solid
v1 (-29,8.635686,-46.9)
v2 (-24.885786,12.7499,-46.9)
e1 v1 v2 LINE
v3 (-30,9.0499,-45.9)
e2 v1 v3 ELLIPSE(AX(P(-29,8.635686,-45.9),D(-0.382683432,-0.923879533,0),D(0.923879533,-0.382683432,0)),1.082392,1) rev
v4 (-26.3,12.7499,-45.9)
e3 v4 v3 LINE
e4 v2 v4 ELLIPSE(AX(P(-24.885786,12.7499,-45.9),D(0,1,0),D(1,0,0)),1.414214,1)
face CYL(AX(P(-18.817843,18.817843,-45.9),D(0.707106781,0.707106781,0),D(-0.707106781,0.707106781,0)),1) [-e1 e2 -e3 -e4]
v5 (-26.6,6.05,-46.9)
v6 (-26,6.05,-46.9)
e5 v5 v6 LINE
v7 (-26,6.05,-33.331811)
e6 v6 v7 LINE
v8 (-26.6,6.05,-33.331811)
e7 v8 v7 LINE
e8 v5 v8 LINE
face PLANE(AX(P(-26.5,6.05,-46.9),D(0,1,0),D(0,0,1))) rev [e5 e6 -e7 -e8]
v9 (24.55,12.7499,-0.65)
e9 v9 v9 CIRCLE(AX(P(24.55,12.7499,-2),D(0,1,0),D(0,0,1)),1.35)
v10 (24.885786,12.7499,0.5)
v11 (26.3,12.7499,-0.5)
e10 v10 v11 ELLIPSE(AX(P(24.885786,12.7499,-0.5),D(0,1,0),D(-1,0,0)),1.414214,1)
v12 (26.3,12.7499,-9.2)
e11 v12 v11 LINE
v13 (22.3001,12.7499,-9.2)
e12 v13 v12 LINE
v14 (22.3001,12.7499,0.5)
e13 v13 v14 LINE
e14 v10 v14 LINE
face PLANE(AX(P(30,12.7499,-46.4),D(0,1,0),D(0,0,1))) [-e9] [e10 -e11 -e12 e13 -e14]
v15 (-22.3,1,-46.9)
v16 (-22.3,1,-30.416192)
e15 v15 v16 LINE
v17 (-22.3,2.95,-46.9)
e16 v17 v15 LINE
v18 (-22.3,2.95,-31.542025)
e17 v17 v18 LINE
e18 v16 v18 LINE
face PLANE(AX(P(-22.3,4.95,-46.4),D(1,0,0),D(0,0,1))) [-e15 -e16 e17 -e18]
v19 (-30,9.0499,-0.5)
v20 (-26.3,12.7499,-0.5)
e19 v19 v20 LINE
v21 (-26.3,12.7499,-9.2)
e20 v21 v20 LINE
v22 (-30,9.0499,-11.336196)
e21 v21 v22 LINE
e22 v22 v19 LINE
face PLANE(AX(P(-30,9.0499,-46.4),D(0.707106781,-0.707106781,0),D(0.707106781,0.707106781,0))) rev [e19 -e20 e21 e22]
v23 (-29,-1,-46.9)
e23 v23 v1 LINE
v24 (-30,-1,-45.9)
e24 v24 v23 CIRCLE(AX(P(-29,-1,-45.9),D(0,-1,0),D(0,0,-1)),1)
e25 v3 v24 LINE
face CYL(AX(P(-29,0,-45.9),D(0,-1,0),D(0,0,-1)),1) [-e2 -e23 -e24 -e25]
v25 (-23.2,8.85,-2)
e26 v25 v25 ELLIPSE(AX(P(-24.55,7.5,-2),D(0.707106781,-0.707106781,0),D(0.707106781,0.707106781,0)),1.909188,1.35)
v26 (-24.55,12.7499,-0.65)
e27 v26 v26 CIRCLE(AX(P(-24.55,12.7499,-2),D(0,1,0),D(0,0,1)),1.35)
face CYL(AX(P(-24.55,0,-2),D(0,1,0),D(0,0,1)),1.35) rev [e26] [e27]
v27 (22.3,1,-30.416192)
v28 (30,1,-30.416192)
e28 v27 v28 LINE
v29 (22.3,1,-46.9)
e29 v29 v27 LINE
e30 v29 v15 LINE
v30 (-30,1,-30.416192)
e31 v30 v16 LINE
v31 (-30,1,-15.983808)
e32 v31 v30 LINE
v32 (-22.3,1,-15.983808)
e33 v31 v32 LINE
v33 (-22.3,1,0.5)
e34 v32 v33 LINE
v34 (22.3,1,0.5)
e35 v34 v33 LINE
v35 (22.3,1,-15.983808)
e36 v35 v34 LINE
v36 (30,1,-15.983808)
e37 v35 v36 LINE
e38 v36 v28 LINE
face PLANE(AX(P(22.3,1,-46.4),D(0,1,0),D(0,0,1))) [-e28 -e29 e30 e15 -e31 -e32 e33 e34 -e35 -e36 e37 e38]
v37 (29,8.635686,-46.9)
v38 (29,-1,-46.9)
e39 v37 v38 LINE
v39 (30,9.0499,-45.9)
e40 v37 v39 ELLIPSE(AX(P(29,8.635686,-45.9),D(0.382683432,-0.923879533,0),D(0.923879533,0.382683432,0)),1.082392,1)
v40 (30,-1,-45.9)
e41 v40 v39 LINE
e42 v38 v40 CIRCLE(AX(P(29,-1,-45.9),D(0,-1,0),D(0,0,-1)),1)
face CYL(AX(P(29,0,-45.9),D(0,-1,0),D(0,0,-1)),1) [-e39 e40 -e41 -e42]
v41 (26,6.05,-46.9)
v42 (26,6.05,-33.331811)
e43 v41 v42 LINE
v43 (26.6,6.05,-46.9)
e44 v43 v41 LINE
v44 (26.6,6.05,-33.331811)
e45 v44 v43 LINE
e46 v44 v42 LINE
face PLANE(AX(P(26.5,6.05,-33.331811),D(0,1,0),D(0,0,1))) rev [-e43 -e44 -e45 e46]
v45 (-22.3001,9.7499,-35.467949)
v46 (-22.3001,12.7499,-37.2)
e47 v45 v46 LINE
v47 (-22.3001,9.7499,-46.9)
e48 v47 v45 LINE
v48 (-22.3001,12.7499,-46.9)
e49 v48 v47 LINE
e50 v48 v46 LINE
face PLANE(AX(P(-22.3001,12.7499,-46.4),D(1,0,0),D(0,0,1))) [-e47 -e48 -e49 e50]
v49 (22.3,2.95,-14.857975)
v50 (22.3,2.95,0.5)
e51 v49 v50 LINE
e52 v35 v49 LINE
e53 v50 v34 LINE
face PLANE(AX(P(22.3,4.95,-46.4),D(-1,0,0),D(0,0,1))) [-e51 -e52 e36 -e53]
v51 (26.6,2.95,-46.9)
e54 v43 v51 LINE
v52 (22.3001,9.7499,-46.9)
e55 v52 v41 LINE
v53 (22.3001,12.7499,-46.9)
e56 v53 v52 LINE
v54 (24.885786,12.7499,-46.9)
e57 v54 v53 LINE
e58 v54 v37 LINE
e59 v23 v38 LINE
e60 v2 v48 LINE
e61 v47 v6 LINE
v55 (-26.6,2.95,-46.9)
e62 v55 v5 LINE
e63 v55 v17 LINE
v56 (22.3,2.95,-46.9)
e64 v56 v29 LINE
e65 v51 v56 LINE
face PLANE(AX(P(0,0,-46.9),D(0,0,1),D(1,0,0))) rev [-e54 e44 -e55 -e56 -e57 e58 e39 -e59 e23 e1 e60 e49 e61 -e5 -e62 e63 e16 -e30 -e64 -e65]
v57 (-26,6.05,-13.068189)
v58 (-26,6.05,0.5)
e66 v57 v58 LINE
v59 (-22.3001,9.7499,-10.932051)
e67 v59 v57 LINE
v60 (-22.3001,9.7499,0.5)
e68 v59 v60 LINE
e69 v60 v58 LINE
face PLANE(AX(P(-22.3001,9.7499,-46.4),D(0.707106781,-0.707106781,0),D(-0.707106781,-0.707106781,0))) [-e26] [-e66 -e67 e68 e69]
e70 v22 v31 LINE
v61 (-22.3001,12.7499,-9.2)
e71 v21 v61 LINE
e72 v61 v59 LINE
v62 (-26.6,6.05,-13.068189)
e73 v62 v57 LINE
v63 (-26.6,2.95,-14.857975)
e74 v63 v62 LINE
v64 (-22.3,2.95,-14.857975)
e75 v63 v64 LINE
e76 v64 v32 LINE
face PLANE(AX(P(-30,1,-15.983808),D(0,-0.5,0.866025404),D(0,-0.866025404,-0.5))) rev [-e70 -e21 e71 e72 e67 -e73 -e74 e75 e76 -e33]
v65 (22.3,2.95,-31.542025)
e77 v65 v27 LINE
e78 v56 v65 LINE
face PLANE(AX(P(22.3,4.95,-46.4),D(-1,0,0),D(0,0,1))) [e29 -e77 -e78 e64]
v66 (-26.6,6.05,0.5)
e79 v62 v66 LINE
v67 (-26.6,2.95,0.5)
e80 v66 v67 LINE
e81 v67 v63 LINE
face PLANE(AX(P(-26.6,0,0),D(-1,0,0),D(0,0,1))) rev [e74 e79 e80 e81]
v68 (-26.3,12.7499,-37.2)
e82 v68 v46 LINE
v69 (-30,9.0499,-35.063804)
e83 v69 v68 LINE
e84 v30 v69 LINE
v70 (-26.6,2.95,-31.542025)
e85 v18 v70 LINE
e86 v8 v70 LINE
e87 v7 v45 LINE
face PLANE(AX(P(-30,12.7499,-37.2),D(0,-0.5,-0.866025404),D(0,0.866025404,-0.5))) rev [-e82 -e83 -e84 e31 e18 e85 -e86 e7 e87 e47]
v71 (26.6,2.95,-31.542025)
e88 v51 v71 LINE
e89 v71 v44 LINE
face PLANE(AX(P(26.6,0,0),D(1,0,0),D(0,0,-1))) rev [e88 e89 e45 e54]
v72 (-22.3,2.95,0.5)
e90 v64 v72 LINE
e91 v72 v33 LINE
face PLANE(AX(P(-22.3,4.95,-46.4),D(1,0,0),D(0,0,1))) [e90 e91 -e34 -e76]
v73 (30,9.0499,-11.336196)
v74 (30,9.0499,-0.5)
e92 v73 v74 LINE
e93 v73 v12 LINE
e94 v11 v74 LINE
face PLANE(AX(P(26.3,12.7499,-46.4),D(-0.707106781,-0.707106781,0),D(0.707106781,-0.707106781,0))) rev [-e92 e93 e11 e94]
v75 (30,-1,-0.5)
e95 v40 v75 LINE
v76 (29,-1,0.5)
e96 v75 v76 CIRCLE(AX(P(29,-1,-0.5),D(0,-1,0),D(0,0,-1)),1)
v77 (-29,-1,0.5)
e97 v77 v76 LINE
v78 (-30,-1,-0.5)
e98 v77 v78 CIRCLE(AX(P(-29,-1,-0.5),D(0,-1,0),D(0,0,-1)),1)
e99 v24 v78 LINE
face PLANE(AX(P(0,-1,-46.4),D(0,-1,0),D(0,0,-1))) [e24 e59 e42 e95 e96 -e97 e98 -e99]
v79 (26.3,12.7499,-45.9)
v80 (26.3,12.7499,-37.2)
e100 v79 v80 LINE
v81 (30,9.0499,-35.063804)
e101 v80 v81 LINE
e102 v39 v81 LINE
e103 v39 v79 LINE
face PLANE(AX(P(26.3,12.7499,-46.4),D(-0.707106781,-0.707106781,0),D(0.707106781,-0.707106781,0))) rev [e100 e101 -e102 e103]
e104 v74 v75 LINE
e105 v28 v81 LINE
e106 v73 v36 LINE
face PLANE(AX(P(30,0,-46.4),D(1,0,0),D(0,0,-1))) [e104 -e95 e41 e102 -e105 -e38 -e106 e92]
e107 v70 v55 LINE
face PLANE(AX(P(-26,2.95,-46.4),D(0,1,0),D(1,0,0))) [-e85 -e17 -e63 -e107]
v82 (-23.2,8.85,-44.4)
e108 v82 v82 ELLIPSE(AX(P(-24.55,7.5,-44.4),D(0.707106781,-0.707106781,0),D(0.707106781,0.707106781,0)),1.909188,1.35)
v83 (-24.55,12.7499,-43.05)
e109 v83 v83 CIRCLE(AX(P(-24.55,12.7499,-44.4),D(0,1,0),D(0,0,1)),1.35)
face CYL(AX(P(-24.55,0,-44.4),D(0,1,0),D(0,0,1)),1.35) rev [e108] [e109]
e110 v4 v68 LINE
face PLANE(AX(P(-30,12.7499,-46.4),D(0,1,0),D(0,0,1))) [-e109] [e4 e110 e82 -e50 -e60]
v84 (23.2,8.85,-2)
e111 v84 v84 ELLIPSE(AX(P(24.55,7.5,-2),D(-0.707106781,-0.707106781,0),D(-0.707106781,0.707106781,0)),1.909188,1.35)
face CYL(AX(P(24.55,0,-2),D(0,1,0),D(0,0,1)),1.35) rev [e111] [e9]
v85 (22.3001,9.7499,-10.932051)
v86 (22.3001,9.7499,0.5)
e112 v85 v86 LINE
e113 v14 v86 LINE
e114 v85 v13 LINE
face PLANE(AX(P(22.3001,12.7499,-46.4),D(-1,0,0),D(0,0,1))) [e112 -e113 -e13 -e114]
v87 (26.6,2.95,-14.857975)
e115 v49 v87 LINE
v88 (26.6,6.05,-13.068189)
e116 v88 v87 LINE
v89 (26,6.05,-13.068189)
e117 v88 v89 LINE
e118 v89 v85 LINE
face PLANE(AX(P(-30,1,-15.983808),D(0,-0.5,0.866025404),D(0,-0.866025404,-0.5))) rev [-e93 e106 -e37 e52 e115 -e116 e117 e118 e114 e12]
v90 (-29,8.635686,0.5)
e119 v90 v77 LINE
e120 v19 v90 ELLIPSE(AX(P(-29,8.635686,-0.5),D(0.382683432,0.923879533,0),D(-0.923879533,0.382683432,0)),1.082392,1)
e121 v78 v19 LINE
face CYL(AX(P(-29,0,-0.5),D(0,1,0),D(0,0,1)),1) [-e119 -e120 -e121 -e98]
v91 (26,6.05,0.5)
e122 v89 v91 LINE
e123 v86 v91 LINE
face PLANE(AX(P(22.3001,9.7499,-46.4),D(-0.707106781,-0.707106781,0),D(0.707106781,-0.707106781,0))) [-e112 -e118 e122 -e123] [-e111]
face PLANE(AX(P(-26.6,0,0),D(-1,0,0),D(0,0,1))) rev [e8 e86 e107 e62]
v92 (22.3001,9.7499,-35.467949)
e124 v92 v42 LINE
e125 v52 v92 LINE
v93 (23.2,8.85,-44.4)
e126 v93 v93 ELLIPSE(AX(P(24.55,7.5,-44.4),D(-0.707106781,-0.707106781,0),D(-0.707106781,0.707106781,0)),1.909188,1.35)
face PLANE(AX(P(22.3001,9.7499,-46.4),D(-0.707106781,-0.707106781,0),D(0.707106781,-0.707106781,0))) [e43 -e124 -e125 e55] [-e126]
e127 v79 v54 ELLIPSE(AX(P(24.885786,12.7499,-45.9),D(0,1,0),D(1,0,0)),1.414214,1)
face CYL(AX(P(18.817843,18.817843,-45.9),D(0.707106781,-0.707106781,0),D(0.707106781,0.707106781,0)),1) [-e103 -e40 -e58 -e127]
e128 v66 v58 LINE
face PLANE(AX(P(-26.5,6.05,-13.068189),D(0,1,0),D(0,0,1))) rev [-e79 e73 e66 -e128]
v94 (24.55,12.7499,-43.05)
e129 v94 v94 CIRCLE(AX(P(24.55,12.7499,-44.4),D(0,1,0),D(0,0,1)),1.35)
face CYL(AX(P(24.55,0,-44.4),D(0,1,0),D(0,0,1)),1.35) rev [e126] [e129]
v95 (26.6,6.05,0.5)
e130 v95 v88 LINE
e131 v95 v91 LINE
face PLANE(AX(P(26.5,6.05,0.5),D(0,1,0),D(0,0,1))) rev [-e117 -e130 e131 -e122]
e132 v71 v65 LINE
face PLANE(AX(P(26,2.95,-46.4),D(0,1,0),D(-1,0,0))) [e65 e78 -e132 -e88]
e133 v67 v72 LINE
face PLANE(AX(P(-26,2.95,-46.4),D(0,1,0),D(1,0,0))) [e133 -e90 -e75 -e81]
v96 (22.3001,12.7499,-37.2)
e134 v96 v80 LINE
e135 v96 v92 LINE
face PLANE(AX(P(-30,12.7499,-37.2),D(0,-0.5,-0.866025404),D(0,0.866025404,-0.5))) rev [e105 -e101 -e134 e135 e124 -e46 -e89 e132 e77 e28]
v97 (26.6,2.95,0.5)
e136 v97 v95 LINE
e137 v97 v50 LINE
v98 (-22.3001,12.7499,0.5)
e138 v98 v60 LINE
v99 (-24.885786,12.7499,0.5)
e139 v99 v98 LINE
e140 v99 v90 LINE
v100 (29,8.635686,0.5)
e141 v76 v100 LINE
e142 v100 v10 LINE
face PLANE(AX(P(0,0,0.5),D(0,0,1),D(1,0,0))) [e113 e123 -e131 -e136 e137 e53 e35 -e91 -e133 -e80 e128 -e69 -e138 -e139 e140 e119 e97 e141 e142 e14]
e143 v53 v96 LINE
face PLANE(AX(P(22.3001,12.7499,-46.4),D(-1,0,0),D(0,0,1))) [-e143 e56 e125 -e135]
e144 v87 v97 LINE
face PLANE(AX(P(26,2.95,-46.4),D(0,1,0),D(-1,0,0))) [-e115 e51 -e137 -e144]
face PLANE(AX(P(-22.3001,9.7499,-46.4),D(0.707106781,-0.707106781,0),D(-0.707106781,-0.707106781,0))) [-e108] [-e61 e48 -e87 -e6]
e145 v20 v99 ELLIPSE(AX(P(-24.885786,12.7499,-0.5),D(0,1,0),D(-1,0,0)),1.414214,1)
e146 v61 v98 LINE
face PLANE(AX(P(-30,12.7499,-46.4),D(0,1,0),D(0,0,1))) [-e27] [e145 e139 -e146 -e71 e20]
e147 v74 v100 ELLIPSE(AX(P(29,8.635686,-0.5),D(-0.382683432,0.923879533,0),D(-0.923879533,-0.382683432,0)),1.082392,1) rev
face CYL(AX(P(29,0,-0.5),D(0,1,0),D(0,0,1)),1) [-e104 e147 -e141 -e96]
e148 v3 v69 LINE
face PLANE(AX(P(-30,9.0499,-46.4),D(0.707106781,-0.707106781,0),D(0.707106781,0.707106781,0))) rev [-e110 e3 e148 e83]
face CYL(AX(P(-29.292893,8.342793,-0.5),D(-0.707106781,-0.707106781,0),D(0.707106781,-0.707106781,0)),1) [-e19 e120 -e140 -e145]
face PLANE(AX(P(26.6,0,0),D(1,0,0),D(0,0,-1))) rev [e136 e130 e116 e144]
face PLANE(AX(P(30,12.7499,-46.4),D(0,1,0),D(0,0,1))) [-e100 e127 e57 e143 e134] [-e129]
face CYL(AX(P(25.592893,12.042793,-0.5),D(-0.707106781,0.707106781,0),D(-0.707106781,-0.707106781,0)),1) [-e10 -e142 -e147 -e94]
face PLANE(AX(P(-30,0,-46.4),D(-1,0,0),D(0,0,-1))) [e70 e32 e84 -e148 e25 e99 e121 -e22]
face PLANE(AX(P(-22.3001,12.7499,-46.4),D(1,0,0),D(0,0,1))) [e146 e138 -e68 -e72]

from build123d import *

# Parameters (mm, degrees)
BOSS_EXTRUDE1_DEPTH   = 46.39999966
SKETCH2_R             = 1.35
CUT_EXTRUDE1_DEPTH    = 57.705554564
CUT_EXTRUDE2_DEPTH    = 57.705554564
CUT_EXTRUDE3_DEPTH    = 77.912417193
MOVE_FACE1_BY         = 0.5
MOVE_FACE1_2_BY       = 0.5
CUT_EXTRUDE5_DEPTH    = 0.5
CUT_EXTRUDE6_DEPTH    = 0.5
MOVE_START            = 2.95
MOVE_FACE2_OUTLINE_W  = 4.2
MOVE_FACE2_OUTLINE_H  = 47.39999966
MOVE_FACE2_OUTLINE_R  = 1.35
MOVE_FACE2_DEPTH      = 2
MOVE_FACE3_BY         = 2
MOVE_FACE4_BY         = 0.1
MOVE_FACE4_2_BY       = 0.1
MOVE_FACE4_3_BY       = 0.1
MOVE_FACE4_4_BY       = 0.1
SKETCH14_W            = 31.645569848
SKETCH14_H            = 25
BOSS_EXTRUDE4_DEPTH   = 4
SKETCH15_R            = 2.1
CUT_EXTRUDE9_DEPTH    = 59.746648569
SKETCH16_R            = 3.6
CUT_EXTRUDE10_DEPTH   = 4.2
MOVE_FACE5_BY         = 4
MOVE_FACE6_BY         = 1
FILLET1_R             = 1
DELETEFACE1_START     = -5
DELETEFACE1_OUTLINE_R = 3.6
DELETEFACE1_DEPTH     = 6
DELETEFACE2_START     = -5
DELETEFACE2_OUTLINE_R = 1.35
DELETEFACE2_DEPTH     = 7.95
MOVE_FACE7_BY         = 4


# Read off the part's stored shape, not the designer's step: Move Face2, DeleteFace1, DeleteFace2
with BuildPart() as part:
    # Sketch1 → Boss-Extrude1 (new body)
    with BuildSketch(Plane.XY):
        Polygon((0, 0), (30, 0), (30, 12.7499), (22.3001, 12.7499), (22.3001, 9.7499), (26, 6.05), (26, 4.95), (22.3, 4.95), (22.3, 1), (0, 1), align=None)
    extrude(amount=-BOSS_EXTRUDE1_DEPTH)

    # Mirror1: part across plane


with BuildPart() as part_1:
    add(part.part)
    add(part.part.mirror(Plane(origin=(0, 1, -46.39999966), x_dir=(0, 0, 1), z_dir=(-1, 0, 0))))

    # Sketch2 → Cut-Extrude1 (cut, through all)
    with BuildSketch(Plane(origin=(0, 12.7499, 0), x_dir=(1, 0, 0), z_dir=(0, 1, 0))):
        with Locations(Location((-24.549999831, 1.999999999, 0), (0, 0, 270))):
            Circle(SKETCH2_R)
        with Locations(Location((-24.549999831, 44.399999661, 0), (0, 0, 270))):
            Circle(SKETCH2_R)
        with Locations(Location((24.549999831, 1.999999999, 0), (0, 0, 270))):
            Circle(SKETCH2_R)
        with Locations(Location((24.549999831, 44.399999661, 0), (0, 0, 270))):
            Circle(SKETCH2_R)
    extrude(amount=-CUT_EXTRUDE1_DEPTH, mode=Mode.SUBTRACT)

    # Sketch3 → Cut-Extrude2 (cut, through all)
    with BuildSketch(Plane.XY):
        Polygon((26.3, 12.7499), (30, 9.0499), (30, 12.7499), align=None)
        Polygon((-30, 12.7499), (-30, 9.0499), (-26.3, 12.7499), align=None)
    extrude(amount=-CUT_EXTRUDE2_DEPTH, mode=Mode.SUBTRACT)

    # Sketch4 → Cut-Extrude3 (cut, through all)
    with BuildSketch(Plane(origin=(30, 0, 0), x_dir=(0, 0, -1), z_dir=(1, 0, 0))):
        Polygon((9.19999983, 12.7499), (37.19999983, 12.7499), (30.416191902, 1), (15.983807758, 1), align=None)
    extrude(amount=-CUT_EXTRUDE3_DEPTH, mode=Mode.SUBTRACT)

    # Move Face1: a face moved outward by 0.5
    extrude(part_1.faces().sort_by_distance((-24, 3.187475, -46.39999966))[0], amount=MOVE_FACE1_BY, dir=(0, 0, -1))

    # Move Face1 2: a face moved outward by 0.5
    extrude(part_1.faces().sort_by_distance((-24, 3.187475, 0))[0], amount=MOVE_FACE1_2_BY, dir=(0, 0, 1))

    # Sketch6 → Cut-Extrude5 (cut)
    with BuildSketch(Plane(origin=(-26, 0, 0), x_dir=(0, 0, -1), z_dir=(1, 0, 0))):
        Polygon((13.703274195, 4.95), (13.068188899, 6.05), (-0.5, 6.05), (-0.5, 4.95), align=None)
        Polygon((33.331810761, 6.05), (32.696725465, 4.95), (46.89999966, 4.95), (46.89999966, 6.05), align=None)
    extrude(amount=-CUT_EXTRUDE5_DEPTH, mode=Mode.SUBTRACT)

    # Sketch7 → Cut-Extrude6 (cut)
    with BuildSketch(Plane.ZY.offset(-26)):
        Polygon((-13.068188899, 6.05), (-13.703274195, 4.95), (0.5, 4.95), (0.5, 6.05), align=None)
        Polygon((-32.696725465, 4.95), (-33.331810761, 6.05), (-46.89999966, 6.05), (-46.89999966, 4.95), align=None)
    extrude(amount=-CUT_EXTRUDE6_DEPTH, mode=Mode.SUBTRACT)

    # Move Face2 outline → Move Face2 (cut)
    # profile 1 of 2: a face of its own
    with BuildSketch(Plane(origin=(0, 0, 0), x_dir=(1, 0, 0), z_dir=(0, 1, 0)).offset(MOVE_START)):
        with Locations((-24.4, 23.19999983)):
            Rectangle(MOVE_FACE2_OUTLINE_W, MOVE_FACE2_OUTLINE_H)
        with Locations((-24.549999831, 1.999999999)):
            Circle(MOVE_FACE2_OUTLINE_R, mode=Mode.SUBTRACT)
        with Locations((-24.549999831, 44.399999661)):
            Circle(MOVE_FACE2_OUTLINE_R, mode=Mode.SUBTRACT)
    # profile 2 of 2: a face of its own
    with BuildSketch(Plane(origin=(0, 0, 0), x_dir=(1, 0, 0), z_dir=(0, 1, 0)).offset(MOVE_START)):
        with Locations((24.4, 23.19999983)):
            Rectangle(MOVE_FACE2_OUTLINE_W, MOVE_FACE2_OUTLINE_H)
        with Locations((24.549999831, 1.999999999)):
            Circle(MOVE_FACE2_OUTLINE_R, mode=Mode.SUBTRACT)
        with Locations((24.549999831, 44.399999661)):
            Circle(MOVE_FACE2_OUTLINE_R, mode=Mode.SUBTRACT)
    extrude(amount=MOVE_FACE2_DEPTH, mode=Mode.SUBTRACT)

    # Move Face3: a face moved outward by 2.0
    extrude(part_1.faces().sort_by_distance((0, 0, -23.19999983))[0], amount=MOVE_FACE3_BY, dir=(0, -1, 0))

    # Move Face4: a face moved inward by 0.1
    extrude(part_1.faces().sort_by_distance((-26.5, 4.468031617, -6.740769385))[0], amount=MOVE_FACE4_BY, dir=(-1, 0, 0), mode=Mode.SUBTRACT)

    # Move Face4 2: a face moved inward by 0.1
    extrude(part_1.faces().sort_by_distance((-26.5, 4.468031617, -39.659230275))[0], amount=MOVE_FACE4_2_BY, dir=(-1, 0, 0), mode=Mode.SUBTRACT)

    # Move Face4 3: a face moved inward by 0.1
    extrude(part_1.faces().sort_by_distance((26.5, 4.468031617, -6.740769385))[0], amount=MOVE_FACE4_3_BY, dir=(1, 0, 0), mode=Mode.SUBTRACT)

    # Move Face4 4: a face moved inward by 0.1
    extrude(part_1.faces().sort_by_distance((26.5, 4.468031617, -39.659230275))[0], amount=MOVE_FACE4_4_BY, dir=(1, 0, 0), mode=Mode.SUBTRACT)

    # Sketch14 → Boss-Extrude4 (add)
    with BuildSketch(Plane.XZ.offset(2)):
        with Locations((0, -23.19999983)):
            Rectangle(SKETCH14_W, SKETCH14_H)
    extrude(amount=BOSS_EXTRUDE4_DEPTH)

    # Sketch15 → Cut-Extrude9 (cut, through all)
    with BuildSketch(Plane.XZ.offset(6)):
        with Locations(Location((-8.5, -14.69999983, 0), (0, 0, 270))):
            Circle(SKETCH15_R)
        with Locations(Location((8.5, -14.69999983, 0), (0, 0, 270))):
            Circle(SKETCH15_R)
        with Locations(Location((8.5, -31.69999983, 0), (0, 0, 270))):
            Circle(SKETCH15_R)
        with Locations(Location((-8.5, -31.69999983, 0), (0, 0, 270))):
            Circle(SKETCH15_R)
    extrude(amount=-CUT_EXTRUDE9_DEPTH, mode=Mode.SUBTRACT)

    # Sketch16 → Cut-Extrude10 (cut)
    with BuildSketch(Plane(origin=(0, 1, 0), x_dir=(1, 0, 0), z_dir=(0, 1, 0))):
        with Locations(Location((-8.5, 31.69999983, 0), (0, 0, 270))):
            Circle(SKETCH16_R)
        with Locations(Location((8.5, 31.69999983, 0), (0, 0, 270))):
            Circle(SKETCH16_R)
        with Locations(Location((8.5, 14.69999983, 0), (0, 0, 270))):
            Circle(SKETCH16_R)
        with Locations(Location((-8.5, 14.69999983, 0), (0, 0, 270))):
            Circle(SKETCH16_R)
    extrude(amount=-CUT_EXTRUDE10_DEPTH, mode=Mode.SUBTRACT)

    # Move Face5: a face moved outward by 4.0
    extrude(part_1.faces().sort_by_distance((0, -2, -42.159999694))[0], amount=MOVE_FACE5_BY, dir=(0, -1, 0))

    # Move Face6: a face moved inward by 1.0
    extrude(part_1.faces().sort_by_distance((0, -6, -23.19999983))[0], amount=MOVE_FACE6_BY, dir=(0, 1, 0), mode=Mode.SUBTRACT)

    # Fillet1
    fillet1_edges = [part_1.edges().sort_by_distance(p)[0] for p in [
        (30, 2.02495, -46.89999966),
        (30, 2.02495, 0.5),
        (-30, 2.02495, 0.5),
        (-30, 2.02495, -46.89999966),
        (28.15, 10.8999, -46.89999966),
        (28.15, 10.8999, 0.5),
        (-28.15, 10.8999, -46.89999966),
        (-28.15, 10.8999, 0.5),
    ]]
    fillet(fillet1_edges, radius=FILLET1_R)

    # DeleteFace1 outline → DeleteFace1 (add)
    with BuildSketch(Plane(origin=(0, 0, 0), x_dir=(1, 0, 0), z_dir=(0, 1, 0)).offset(DELETEFACE1_START)):
        with Locations((-8.5, 14.69999983)):
            Circle(DELETEFACE1_OUTLINE_R)
        with Locations((8.5, 14.69999983)):
            Circle(DELETEFACE1_OUTLINE_R)
        with Locations((8.5, 31.69999983)):
            Circle(DELETEFACE1_OUTLINE_R)
        with Locations((-8.5, 31.69999983)):
            Circle(DELETEFACE1_OUTLINE_R)
    extrude(amount=DELETEFACE1_DEPTH)

    # DeleteFace2 outline → DeleteFace2 (add)
    with BuildSketch(Plane(origin=(0, 0, 0), x_dir=(1, 0, 0), z_dir=(0, 1, 0)).offset(DELETEFACE2_START)):
        with Locations((-24.549999831, 1.999999999)):
            Circle(DELETEFACE2_OUTLINE_R)
        with Locations((-24.549999831, 44.399999661)):
            Circle(DELETEFACE2_OUTLINE_R)
        with Locations((24.549999831, 1.999999999)):
            Circle(DELETEFACE2_OUTLINE_R)
        with Locations((24.549999831, 44.399999661)):
            Circle(DELETEFACE2_OUTLINE_R)
    extrude(amount=DELETEFACE2_DEPTH)

    # Move Face7: a face moved inward by 4.0
    extrude(part_1.faces().sort_by_distance((0, -5, -23.19999983))[0], amount=MOVE_FACE7_BY, dir=(0, 1, 0), mode=Mode.SUBTRACT)


solid = part_1.part
